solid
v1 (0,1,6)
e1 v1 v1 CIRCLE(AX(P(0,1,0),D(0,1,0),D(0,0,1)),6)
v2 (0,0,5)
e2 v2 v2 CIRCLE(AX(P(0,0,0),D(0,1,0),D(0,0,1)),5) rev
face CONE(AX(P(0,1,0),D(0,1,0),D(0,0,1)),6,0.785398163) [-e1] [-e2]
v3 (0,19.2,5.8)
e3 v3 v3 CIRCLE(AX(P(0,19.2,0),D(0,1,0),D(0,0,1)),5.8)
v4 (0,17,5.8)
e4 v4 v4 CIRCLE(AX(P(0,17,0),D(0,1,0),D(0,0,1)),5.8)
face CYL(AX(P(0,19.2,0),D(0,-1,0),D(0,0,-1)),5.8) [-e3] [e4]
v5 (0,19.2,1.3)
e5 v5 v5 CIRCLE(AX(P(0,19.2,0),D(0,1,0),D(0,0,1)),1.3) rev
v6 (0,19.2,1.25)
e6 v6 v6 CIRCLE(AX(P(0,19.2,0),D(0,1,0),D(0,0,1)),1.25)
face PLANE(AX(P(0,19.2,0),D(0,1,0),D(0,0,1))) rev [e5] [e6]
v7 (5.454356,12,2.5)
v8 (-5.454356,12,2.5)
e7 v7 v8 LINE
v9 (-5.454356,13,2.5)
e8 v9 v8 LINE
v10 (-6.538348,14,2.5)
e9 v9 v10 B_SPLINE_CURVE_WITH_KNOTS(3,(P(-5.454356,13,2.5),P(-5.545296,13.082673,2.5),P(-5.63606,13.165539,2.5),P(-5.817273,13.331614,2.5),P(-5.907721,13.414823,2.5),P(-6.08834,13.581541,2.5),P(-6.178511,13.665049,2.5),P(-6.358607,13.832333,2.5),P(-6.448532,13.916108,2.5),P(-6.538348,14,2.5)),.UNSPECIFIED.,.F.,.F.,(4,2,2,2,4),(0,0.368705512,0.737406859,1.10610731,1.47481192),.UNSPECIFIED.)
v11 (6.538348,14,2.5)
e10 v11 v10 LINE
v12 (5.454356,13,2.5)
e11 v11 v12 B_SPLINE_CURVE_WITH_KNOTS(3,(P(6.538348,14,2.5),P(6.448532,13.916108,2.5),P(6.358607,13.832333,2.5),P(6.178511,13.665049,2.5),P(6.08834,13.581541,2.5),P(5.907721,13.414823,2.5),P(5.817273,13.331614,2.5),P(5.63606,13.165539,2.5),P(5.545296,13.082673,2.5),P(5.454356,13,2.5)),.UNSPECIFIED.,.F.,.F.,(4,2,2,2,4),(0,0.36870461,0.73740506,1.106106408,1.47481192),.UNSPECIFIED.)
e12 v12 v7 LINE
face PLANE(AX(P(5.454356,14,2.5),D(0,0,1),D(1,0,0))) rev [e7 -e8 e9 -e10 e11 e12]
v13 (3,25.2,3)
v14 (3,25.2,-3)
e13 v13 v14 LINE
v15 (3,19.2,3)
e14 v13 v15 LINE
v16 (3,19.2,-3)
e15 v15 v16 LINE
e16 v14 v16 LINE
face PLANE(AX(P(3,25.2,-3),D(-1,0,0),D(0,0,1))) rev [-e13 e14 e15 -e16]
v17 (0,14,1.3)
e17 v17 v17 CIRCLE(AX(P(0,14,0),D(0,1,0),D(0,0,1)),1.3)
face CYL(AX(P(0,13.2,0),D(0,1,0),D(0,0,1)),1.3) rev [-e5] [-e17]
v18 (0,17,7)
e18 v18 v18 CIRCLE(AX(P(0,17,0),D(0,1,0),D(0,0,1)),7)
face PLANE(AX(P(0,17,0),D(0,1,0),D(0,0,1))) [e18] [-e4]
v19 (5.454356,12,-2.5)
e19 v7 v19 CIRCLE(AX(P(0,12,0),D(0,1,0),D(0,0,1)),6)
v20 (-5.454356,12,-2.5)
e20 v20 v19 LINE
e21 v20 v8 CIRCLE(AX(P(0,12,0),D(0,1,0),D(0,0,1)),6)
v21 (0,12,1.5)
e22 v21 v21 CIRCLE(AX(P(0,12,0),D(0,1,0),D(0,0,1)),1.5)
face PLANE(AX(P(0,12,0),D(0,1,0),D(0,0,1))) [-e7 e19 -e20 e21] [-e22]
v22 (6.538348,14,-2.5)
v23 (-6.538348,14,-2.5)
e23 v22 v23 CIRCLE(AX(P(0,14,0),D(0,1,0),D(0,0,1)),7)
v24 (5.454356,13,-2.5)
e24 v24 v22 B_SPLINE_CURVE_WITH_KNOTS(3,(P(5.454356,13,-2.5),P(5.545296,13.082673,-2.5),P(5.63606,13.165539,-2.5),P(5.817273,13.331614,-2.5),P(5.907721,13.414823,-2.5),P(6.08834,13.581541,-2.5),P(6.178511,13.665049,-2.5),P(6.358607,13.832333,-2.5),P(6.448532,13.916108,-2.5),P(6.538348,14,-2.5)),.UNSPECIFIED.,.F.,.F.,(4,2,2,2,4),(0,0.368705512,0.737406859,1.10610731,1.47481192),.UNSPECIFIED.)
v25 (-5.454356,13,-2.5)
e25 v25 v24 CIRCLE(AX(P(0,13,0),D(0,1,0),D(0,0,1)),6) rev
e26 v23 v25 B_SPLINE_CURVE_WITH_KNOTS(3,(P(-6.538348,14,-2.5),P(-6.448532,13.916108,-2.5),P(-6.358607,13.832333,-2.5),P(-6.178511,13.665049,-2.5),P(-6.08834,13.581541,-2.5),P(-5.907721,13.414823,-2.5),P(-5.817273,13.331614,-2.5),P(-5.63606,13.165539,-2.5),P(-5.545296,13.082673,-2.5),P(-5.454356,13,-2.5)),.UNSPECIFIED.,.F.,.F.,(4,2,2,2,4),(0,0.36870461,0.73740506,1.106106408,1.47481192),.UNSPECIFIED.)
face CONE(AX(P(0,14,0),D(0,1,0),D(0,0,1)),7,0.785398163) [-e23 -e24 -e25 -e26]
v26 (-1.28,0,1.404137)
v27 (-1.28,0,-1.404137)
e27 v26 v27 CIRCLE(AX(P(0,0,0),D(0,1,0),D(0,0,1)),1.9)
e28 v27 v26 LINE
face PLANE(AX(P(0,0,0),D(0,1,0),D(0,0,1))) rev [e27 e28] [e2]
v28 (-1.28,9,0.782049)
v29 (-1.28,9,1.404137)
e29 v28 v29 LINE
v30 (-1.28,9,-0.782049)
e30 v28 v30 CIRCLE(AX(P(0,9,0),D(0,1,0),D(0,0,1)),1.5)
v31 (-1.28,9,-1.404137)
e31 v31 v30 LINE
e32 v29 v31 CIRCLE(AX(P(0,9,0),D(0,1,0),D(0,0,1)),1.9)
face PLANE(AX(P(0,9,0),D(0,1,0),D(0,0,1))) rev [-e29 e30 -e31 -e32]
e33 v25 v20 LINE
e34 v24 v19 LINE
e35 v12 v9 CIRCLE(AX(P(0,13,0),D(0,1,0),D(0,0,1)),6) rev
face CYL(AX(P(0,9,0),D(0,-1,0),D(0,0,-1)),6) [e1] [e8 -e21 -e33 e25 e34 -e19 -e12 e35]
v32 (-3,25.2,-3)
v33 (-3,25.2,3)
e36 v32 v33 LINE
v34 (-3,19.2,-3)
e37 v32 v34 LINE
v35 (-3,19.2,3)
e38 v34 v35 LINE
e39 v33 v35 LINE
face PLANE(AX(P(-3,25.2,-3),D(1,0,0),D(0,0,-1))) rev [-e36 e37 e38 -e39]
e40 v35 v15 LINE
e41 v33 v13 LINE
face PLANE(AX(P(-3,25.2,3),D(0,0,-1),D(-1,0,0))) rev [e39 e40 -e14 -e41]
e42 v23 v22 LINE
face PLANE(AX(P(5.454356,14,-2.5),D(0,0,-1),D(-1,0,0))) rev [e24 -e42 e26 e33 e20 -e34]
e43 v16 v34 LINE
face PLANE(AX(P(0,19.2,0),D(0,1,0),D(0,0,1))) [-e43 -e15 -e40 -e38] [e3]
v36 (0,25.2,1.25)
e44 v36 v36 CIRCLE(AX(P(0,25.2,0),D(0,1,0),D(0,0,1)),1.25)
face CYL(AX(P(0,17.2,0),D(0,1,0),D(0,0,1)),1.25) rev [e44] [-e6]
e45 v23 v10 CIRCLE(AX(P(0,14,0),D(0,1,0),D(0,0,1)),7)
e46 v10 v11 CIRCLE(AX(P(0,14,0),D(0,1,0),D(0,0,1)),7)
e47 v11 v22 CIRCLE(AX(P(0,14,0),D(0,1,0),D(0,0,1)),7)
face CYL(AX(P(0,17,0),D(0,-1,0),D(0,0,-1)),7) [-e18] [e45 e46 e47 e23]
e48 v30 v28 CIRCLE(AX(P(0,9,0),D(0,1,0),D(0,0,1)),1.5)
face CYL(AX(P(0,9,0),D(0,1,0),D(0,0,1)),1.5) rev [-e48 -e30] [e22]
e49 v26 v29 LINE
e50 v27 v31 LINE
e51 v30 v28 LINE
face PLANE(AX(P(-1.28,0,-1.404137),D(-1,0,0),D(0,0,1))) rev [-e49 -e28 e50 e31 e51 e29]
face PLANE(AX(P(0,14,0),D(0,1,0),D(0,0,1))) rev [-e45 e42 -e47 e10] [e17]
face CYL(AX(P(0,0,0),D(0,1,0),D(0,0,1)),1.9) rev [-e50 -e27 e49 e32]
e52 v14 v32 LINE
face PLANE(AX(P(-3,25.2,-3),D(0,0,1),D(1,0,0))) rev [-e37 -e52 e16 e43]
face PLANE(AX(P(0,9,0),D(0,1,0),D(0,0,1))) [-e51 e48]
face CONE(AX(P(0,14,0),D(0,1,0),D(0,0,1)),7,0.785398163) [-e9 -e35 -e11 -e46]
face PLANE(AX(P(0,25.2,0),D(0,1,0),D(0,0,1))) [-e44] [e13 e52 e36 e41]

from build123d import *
from build123d.topology import SkipClean

# Parameters (mm, degrees)
SKETCH_1_R          = 6
EXTRUDE_1_DEPTH     = 9
CUT_EXTRUDE_1_DEPTH = 13.369316877
SKETCH_3_R          = 6
EXTRUDE_2_DEPTH     = 3
SKETCH_4_R          = 1.5
CUT_EXTRUDE_2_DEPTH = 3
EXTRUDE_3_DEPTH     = 2
SKETCH_7_R          = 7
EXTRUDE_4_DEPTH     = 3
SKETCH_8_R          = 5.8
EXTRUDE_5_DEPTH     = 2.2
SKETCH_9_R          = 1.3
CUT_EXTRUDE_3_DEPTH = 6
CHAMFER_1_SIZE      = 1
SKETCH_10_W         = 6
SKETCH_10_H         = 6
EXTRUDE_6_DEPTH     = 6
SKETCH_11_R         = 1.25
CUT_EXTRUDE_4_DEPTH = 8


with BuildPart() as part:
    # Эскиз1 → Бобышка-Вытянуть1 (new body)
    with BuildSketch(Plane(origin=(0, 0, 0), x_dir=(1, 0, 0), z_dir=(0, 1, 0))):
        with Locations(Location((0, 0, 0), (0, 0, 270))):
            Circle(SKETCH_1_R)
    extrude(amount=EXTRUDE_1_DEPTH)

    # Эскиз2 → Вырез-Вытянуть1 (cut, through all)
    with BuildSketch(Plane(origin=(0, 9, 0), x_dir=(1, 0, 0), z_dir=(0, 1, 0))):
        with BuildLine():
            Line((-1.28, 1.404136745), (-1.28, -1.404136745))
            ThreePointArc((-1.28, -1.404136745), (1.9, 0), (-1.28, 1.404136745))
        make_face()
    extrude(amount=-CUT_EXTRUDE_1_DEPTH, mode=Mode.SUBTRACT)

    # Эскиз3 → Бобышка-Вытянуть2 (add)
    with BuildSketch(Plane(origin=(0, 9, 0), x_dir=(1, 0, 0), z_dir=(0, 1, 0))):
        with Locations(Location((0, 0, 0), (0, 0, 270))):
            Circle(SKETCH_3_R)
    extrude(amount=EXTRUDE_2_DEPTH)

    # Эскиз4 → Вырез-Вытянуть2 (cut)
    with BuildSketch(Plane(origin=(0, 12, 0), x_dir=(1, 0, 0), z_dir=(0, 1, 0))):
        with Locations(Location((0, 0, 0), (0, 0, 270))):
            Circle(SKETCH_4_R)
    extrude(amount=-CUT_EXTRUDE_2_DEPTH, mode=Mode.SUBTRACT)

    # Эскиз5 → Бобышка-Вытянуть3 (add)
    with SkipClean():  # the faces are left unmerged after this step: merging them gives an invalid solid
        with BuildSketch(Plane(origin=(0, 12, 0), x_dir=(1, 0, 0), z_dir=(0, 1, 0))):
            with BuildLine():
                Line((5.454356057, 2.5), (-5.454356057, 2.5))
                ThreePointArc((-5.454356057, 2.5), (0, 6), (5.454356057, 2.5))
            make_face()
            with BuildLine():
                Line((5.454356057, -2.5), (-5.454356057, -2.5))
                ThreePointArc((-5.454356057, -2.5), (0, -6), (5.454356057, -2.5))
            make_face()
        extrude(amount=EXTRUDE_3_DEPTH)

    # Эскиз7 → Бобышка-Вытянуть4 (add)
    with BuildSketch(Plane(origin=(0, 14, 0), x_dir=(1, 0, 0), z_dir=(0, 1, 0))):
        with Locations(Location((0, 0, 0), (0, 0, 270))):
            Circle(SKETCH_7_R)
    extrude(amount=EXTRUDE_4_DEPTH)

    # Эскиз8 → Бобышка-Вытянуть5 (add)
    with BuildSketch(Plane(origin=(0, 17, 0), x_dir=(1, 0, 0), z_dir=(0, 1, 0))):
        with Locations(Location((0, 0, 0), (0, 0, 270))):
            Circle(SKETCH_8_R)
    extrude(amount=EXTRUDE_5_DEPTH)

    # Эскиз9 → Вырез-Вытянуть3 (cut)
    with BuildSketch(Plane(origin=(0, 19.2, 0), x_dir=(1, 0, 0), z_dir=(0, 1, 0))):
        with Locations(Location((0, 0, 0), (0, 0, 270))):
            Circle(SKETCH_9_R)
    extrude(amount=-CUT_EXTRUDE_3_DEPTH, mode=Mode.SUBTRACT)

    # Фаска1
    # the kernel refuses this chamfer: 1 mm, written as the material it adds along each edge
    with BuildSketch(Plane(origin=(0, 14, 0), x_dir=(-0.9999996815285755, 0, -0.0007980869299166744), z_dir=(-0.0007980869299166744, 0, 0.9999996815285755))) as chamfer_1_piece_1_section:
        Polygon((6 + CHAMFER_1_SIZE, 0), (6, CHAMFER_1_SIZE), (6, 0), align=None)
    chamfer_1_piece_1 = revolve(axis=Axis((0, 14, 0), (0, -1, 0)), revolution_arc=179.908545965, mode=Mode.PRIVATE)
    chamfer_1_piece_1 = chamfer_1_piece_1 & Plane(origin=(0, 13.500057011, 0), x_dir=(0, 0, 1), z_dir=(0, -1, 0)) * Cylinder(7, 28, mode=Mode.PRIVATE)
    chamfer_1_piece_1 = split(chamfer_1_piece_1, bisect_by=Plane(origin=(0, 13.500057011, -2.5), z_dir=(0, 0, -1)), keep=Keep.TOP, mode=Mode.PRIVATE)
    add(chamfer_1_piece_1)
    with BuildSketch(Plane(origin=(0, 14, 0), x_dir=(-0.9999996815285755, 0, 0.0007980869299168965), z_dir=(-0.0007980869299168965, 0, -0.9999996815285755))) as chamfer_1_piece_2_section:
        Polygon((6 + CHAMFER_1_SIZE, 0), (6, -CHAMFER_1_SIZE), (6, 0), align=None)
    chamfer_1_piece_2 = revolve(axis=Axis((0, 14, 0), (0, 1, 0)), revolution_arc=179.908545965, mode=Mode.PRIVATE)
    chamfer_1_piece_2 = chamfer_1_piece_2 & Plane(origin=(0, 13.500057011, 0), x_dir=(0, 0, 1), z_dir=(0, -1, 0)) * Cylinder(7, 28, mode=Mode.PRIVATE)
    chamfer_1_piece_2 = split(chamfer_1_piece_2, bisect_by=Plane(origin=(0, 13.500057011, 2.5), z_dir=(0, 0, 1)), keep=Keep.TOP, mode=Mode.PRIVATE)
    add(chamfer_1_piece_2)
    # the kernel refuses this chamfer: 1 mm, written as the material it takes off along each edge
    with BuildSketch(Plane(origin=(0, 0, 0), x_dir=(0, 0, 1), z_dir=(-1, 0, 0))) as chamfer_1_2_piece_1:
        Polygon((6 - CHAMFER_1_SIZE, 0), (6, CHAMFER_1_SIZE), (6, 0), align=None)
    revolve(axis=Axis((0, 0, 0), (0, 1, 0)), mode=Mode.SUBTRACT)

    # Эскиз10 → Бобышка-Вытянуть6 (add)
    with BuildSketch(Plane(origin=(0, 19.2, 0), x_dir=(1, 0, 0), z_dir=(0, 1, 0))):
        Rectangle(SKETCH_10_W, SKETCH_10_H)
    extrude(amount=EXTRUDE_6_DEPTH)

    # Эскиз11 → Вырез-Вытянуть4 (cut)
    with BuildSketch(Plane(origin=(0, 25.2, 0), x_dir=(1, 0, 0), z_dir=(0, 1, 0))):
        with Locations(Location((0, 0, 0), (0, 0, 270))):
            Circle(SKETCH_11_R)
    extrude(amount=-CUT_EXTRUDE_4_DEPTH, mode=Mode.SUBTRACT)


solid = part.part
